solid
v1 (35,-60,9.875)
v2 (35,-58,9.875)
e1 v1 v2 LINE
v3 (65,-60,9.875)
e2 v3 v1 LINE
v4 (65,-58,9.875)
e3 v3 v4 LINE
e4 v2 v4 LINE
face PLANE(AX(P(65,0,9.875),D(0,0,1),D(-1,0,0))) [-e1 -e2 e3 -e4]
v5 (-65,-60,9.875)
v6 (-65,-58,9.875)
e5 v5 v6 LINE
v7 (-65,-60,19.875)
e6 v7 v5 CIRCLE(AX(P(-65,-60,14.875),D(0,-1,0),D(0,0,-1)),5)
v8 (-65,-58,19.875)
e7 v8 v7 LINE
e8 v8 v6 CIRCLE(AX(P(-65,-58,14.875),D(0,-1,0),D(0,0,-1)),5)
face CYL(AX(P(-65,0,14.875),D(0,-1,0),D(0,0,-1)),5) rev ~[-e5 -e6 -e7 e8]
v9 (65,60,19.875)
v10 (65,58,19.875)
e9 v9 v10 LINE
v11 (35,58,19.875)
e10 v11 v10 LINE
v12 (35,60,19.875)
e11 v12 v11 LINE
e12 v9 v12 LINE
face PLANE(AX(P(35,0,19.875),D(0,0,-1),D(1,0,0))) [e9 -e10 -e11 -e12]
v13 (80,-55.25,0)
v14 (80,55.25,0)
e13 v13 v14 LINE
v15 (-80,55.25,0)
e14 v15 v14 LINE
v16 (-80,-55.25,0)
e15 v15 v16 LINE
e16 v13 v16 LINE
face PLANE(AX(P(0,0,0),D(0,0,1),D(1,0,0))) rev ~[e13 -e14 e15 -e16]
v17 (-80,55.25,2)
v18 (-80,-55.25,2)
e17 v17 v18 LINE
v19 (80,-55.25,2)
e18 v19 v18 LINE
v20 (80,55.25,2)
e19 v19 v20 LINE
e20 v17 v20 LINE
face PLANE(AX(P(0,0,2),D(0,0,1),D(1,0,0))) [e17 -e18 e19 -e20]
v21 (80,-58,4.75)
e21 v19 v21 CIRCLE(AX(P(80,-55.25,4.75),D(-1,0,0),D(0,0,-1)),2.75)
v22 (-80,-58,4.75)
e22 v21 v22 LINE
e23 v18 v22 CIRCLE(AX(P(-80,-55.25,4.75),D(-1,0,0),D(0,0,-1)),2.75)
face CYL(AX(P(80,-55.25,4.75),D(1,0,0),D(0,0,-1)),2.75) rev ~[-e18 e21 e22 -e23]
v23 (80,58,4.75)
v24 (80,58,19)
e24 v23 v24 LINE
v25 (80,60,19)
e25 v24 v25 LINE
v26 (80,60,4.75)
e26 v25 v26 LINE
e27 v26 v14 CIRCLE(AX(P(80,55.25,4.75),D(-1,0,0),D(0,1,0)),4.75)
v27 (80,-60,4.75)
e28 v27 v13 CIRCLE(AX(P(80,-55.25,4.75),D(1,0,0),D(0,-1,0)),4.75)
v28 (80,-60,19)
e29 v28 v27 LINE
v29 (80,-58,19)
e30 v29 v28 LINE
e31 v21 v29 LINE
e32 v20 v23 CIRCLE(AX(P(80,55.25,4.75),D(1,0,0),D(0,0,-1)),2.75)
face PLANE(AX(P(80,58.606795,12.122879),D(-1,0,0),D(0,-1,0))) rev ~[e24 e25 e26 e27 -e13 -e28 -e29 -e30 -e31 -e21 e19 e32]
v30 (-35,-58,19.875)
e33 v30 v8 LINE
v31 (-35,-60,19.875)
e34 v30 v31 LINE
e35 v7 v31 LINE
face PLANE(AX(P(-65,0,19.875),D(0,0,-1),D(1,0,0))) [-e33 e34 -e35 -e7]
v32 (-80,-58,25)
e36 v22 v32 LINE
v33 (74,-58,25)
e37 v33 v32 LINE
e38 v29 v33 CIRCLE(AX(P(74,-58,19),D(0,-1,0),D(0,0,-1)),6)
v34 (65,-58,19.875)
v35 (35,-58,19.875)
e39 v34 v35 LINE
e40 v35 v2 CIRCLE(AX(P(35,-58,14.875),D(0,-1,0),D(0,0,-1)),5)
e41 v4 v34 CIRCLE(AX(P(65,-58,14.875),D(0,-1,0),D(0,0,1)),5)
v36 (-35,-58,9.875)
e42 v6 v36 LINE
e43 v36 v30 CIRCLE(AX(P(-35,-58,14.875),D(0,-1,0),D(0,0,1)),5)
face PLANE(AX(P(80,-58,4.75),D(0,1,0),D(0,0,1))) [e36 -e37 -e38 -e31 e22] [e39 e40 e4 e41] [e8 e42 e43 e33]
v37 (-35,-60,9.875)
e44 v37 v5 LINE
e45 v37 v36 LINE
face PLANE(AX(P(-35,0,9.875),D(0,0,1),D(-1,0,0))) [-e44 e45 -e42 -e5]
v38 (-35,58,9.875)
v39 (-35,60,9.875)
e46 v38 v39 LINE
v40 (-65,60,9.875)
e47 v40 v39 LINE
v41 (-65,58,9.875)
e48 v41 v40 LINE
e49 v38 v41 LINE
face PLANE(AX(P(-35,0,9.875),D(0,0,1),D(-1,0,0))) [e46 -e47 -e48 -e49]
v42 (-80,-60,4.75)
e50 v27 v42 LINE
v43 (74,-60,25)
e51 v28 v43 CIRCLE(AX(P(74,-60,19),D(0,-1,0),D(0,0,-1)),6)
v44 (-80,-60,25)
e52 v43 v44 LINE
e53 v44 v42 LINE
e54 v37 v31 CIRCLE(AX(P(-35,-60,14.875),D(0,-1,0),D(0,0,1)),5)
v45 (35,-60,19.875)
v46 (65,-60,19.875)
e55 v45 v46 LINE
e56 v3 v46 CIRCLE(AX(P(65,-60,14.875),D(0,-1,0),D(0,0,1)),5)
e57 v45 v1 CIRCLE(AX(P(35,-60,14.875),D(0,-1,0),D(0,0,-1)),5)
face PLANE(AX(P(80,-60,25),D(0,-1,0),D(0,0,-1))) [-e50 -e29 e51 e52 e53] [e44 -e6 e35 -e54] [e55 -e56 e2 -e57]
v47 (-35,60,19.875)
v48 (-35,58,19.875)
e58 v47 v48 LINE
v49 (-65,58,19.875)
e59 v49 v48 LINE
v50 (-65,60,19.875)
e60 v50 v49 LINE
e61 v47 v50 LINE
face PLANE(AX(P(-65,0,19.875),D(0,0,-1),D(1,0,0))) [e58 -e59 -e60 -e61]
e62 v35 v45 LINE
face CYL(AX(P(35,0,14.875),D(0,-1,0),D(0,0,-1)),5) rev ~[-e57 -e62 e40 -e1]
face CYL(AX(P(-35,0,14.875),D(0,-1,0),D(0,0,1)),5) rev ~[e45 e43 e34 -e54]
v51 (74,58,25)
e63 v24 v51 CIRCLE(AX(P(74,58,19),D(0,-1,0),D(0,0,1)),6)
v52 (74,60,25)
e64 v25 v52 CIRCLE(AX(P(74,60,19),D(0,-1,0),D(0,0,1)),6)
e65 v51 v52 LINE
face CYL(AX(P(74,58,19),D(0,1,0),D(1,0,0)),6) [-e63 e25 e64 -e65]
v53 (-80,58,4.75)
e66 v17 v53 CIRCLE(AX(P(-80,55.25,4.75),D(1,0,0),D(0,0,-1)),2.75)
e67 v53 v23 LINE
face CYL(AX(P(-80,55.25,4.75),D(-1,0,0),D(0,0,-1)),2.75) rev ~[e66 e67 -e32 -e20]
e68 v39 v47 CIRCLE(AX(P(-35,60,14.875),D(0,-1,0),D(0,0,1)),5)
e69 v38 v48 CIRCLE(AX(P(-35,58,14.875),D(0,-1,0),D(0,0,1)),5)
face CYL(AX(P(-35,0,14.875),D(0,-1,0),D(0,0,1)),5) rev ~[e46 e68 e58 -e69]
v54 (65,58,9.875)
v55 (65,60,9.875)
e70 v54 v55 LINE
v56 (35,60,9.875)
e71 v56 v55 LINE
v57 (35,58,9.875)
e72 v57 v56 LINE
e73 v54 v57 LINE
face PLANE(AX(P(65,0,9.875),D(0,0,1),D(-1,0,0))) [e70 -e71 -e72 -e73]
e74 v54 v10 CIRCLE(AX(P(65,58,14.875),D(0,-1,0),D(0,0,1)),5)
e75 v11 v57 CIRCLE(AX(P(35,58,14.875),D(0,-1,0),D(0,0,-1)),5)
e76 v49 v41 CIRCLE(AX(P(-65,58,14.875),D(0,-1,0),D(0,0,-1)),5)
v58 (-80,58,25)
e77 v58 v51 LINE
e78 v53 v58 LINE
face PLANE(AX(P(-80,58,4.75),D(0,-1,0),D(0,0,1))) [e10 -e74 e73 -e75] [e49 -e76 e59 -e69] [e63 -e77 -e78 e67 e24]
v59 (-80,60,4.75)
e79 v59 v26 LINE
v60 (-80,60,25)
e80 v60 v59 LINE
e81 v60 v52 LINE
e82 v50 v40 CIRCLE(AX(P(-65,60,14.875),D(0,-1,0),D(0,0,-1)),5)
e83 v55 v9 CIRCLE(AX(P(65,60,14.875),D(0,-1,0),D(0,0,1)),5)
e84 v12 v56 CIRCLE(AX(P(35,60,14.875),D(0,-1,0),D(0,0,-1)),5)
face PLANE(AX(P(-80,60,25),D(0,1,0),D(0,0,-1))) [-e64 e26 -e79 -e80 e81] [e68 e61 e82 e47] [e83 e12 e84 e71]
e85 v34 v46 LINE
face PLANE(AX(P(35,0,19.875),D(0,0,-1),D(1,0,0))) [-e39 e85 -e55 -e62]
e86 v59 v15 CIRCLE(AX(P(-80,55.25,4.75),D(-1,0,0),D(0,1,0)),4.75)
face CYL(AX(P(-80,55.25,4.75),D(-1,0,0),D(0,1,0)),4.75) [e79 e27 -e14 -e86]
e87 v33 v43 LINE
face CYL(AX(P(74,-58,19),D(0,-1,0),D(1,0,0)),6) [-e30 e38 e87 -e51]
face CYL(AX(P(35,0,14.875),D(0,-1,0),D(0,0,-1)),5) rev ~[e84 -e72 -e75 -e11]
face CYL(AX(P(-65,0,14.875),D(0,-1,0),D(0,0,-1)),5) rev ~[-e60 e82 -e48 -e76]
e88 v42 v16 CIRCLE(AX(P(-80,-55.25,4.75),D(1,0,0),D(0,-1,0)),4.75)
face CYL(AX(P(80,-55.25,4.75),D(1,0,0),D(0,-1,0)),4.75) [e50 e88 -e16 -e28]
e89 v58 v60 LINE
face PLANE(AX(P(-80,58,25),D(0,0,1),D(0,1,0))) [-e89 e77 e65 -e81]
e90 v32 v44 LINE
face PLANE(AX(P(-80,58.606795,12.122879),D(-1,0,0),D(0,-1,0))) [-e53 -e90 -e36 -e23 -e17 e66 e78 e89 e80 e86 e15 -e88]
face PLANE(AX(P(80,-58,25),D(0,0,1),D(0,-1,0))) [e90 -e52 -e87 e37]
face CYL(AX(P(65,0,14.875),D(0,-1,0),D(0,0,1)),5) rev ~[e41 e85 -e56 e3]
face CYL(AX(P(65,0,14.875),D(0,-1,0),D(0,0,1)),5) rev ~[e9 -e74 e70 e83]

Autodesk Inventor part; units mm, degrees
ref_plane "YZ Plane" through (0, 0, 0) normal (1, 0, 0) x (0, 1, 0)
ref_plane "XZ Plane" through (0, 0, 0) normal (0, 1, 0) x (-1, 0, 0)
ref_plane "XY Plane" through (0, 0, 0) normal (0, 0, 1) x (1, 0, 0)
sketch "Sketch1" plane through (0, 0, 0) normal (0, 0, 1) x (1, 0, 0)
  line L0 (-80, -60) -> (80, -60)
  line L1 (80, -60) -> (80, 60)
  line L2 (80, 60) -> (-80, 60)
  line L3 (-80, 60) -> (-80, -60)
  line L4 (-80, -60) -> (80, 60) construction
  line L5 (80, -60) -> (-80, 60) construction
  point P0 (0, 0)
  dimension "d0" = 160
  dimension "d1" = 120
extrude "Plate1" add sketch "Sketch1" along normal blind 2
sketch "Sketch2" plane through (0, 0, 0) normal (0, 0, -1) x (-1, 0, 0)
  line L0 (-60, 40) -> (140, 40) construction
  line L1 (140, 40) -> (140, 20) construction
  line L2 (140, 20) -> (-60, 20) construction
  line L3 (-60, 20) -> (-60, 40) construction
  line L4 (-80, 60) -> (80, 60) projected
  line L5 (-80, -60) -> (-80, 60) projected
  point P0 (0, 0)
  point P1 (-48, 100)
  point P2 (-50, 98)
  dimension "d6" = 200
  dimension "d9" = 20
  dimension "d10" = 20
  dimension "d11" = 20
mark "Mark1"
sketch "Sketch3" plane through (80, 58, 0) normal (0, 1, 0) x (-1, 0, 0)
  line L0 (160, 0) -> (0, 0)
  line L1 (0, 0) -> (0, -25)
  line L2 (0, -25) -> (160, -25)
  line L3 (160, -25) -> (160, 0)
edge flange "Flange1" height 25 angle 90 thickness 2 bend radius 2.75 thickness toward (0, 1, 0) relief round relief width 2 relief depth 1 corner gap 2.75 corner form 0 edges at (0, 60, 0) (0, -60, 0) wall of the first edge with corners at (-80, 58, 0) (80, 58, 0) (80, 58, 25) (-80, 58, 25)
bend "Bend1"
corner "Corner1"
sketch "Sketch4" plane through (0, 0, 0) normal (0, 1, 0) x (-1, 0, 0)
  line L0 (-80, 4.75) -> (80, 4.75) construction
  line L1 (80, 4.75) -> (80, 25) projected
  line L2 (80, 25) -> (-80, 25) construction
  line L3 (-80, 4.75) -> (-80, 25) projected
  line L4 (-65, 14.875) -> (-35, 14.875) construction
  line L5 (-65, 9.875) -> (-35, 9.875)
  line L6 (-35, 19.875) -> (-65, 19.875)
  arc A0 (-65, 19.875) -> (-65, 9.875) centre (-65, 14.875) ccw
  arc A1 (-35, 9.875) -> (-35, 19.875) centre (-35, 14.875) ccw
  line L7 (35, 14.875) -> (65, 14.875) construction
  line L8 (35, 9.875) -> (65, 9.875)
  line L9 (65, 19.875) -> (35, 19.875)
  arc A2 (35, 19.875) -> (35, 9.875) centre (35, 14.875) ccw
  arc A3 (65, 9.875) -> (65, 19.875) centre (65, 14.875) ccw
  line L10 (0, 4.75) -> (0, 25) construction
  point P0 (0, 0)
  point P1 (-50, 14.875)
  point P2 (50, 14.875)
  point P3 (-80, 14.875)
  dimension "d22" = 30
  dimension "d23" = 10
  dimension "d24" = 100
extrude "Extrusion1" cut sketch "Sketch4" along normal through all both and the other way through all
fillet "Corner Round1" radius 6 2 edges at (80, 59, 25) (80, -59, 25)
equation "\"d2\" = Thickness"
equation "\"d12\" = BendReliefWidth"
equation "\"d13\" = BendReliefDepth"
equation "\"d14\" = MinimumRemnant"
equation "\"d15\" = TransitionRadius"
equation "\"d18\" = BendRadius"
equation "\"d19\" = CornerReliefSize"
equation "\"d20\" = GapSize"
equation "\"d21\" = JacobiRadiusSize"
equation "\"BendReliefWidth\" = Thickness"
equation "\"BendReliefDepth\" = 0.5 * Thickness"
equation "\"CornerReliefSize\" = 4 * Thickness"
equation "\"MinimumRemnant\" = 2 * Thickness"
equation "\"TransitionRadius\" = BendRadius"
equation "\"JacobiRadiusSize\" = BendRadius"
equation "\"GapSize\" = Thickness"
equation "\"Thickness\" = 2"
equation "\"BendRadius\" = 2.75"
properties part number "TRM 026 right board damper" material "AISI 304"
